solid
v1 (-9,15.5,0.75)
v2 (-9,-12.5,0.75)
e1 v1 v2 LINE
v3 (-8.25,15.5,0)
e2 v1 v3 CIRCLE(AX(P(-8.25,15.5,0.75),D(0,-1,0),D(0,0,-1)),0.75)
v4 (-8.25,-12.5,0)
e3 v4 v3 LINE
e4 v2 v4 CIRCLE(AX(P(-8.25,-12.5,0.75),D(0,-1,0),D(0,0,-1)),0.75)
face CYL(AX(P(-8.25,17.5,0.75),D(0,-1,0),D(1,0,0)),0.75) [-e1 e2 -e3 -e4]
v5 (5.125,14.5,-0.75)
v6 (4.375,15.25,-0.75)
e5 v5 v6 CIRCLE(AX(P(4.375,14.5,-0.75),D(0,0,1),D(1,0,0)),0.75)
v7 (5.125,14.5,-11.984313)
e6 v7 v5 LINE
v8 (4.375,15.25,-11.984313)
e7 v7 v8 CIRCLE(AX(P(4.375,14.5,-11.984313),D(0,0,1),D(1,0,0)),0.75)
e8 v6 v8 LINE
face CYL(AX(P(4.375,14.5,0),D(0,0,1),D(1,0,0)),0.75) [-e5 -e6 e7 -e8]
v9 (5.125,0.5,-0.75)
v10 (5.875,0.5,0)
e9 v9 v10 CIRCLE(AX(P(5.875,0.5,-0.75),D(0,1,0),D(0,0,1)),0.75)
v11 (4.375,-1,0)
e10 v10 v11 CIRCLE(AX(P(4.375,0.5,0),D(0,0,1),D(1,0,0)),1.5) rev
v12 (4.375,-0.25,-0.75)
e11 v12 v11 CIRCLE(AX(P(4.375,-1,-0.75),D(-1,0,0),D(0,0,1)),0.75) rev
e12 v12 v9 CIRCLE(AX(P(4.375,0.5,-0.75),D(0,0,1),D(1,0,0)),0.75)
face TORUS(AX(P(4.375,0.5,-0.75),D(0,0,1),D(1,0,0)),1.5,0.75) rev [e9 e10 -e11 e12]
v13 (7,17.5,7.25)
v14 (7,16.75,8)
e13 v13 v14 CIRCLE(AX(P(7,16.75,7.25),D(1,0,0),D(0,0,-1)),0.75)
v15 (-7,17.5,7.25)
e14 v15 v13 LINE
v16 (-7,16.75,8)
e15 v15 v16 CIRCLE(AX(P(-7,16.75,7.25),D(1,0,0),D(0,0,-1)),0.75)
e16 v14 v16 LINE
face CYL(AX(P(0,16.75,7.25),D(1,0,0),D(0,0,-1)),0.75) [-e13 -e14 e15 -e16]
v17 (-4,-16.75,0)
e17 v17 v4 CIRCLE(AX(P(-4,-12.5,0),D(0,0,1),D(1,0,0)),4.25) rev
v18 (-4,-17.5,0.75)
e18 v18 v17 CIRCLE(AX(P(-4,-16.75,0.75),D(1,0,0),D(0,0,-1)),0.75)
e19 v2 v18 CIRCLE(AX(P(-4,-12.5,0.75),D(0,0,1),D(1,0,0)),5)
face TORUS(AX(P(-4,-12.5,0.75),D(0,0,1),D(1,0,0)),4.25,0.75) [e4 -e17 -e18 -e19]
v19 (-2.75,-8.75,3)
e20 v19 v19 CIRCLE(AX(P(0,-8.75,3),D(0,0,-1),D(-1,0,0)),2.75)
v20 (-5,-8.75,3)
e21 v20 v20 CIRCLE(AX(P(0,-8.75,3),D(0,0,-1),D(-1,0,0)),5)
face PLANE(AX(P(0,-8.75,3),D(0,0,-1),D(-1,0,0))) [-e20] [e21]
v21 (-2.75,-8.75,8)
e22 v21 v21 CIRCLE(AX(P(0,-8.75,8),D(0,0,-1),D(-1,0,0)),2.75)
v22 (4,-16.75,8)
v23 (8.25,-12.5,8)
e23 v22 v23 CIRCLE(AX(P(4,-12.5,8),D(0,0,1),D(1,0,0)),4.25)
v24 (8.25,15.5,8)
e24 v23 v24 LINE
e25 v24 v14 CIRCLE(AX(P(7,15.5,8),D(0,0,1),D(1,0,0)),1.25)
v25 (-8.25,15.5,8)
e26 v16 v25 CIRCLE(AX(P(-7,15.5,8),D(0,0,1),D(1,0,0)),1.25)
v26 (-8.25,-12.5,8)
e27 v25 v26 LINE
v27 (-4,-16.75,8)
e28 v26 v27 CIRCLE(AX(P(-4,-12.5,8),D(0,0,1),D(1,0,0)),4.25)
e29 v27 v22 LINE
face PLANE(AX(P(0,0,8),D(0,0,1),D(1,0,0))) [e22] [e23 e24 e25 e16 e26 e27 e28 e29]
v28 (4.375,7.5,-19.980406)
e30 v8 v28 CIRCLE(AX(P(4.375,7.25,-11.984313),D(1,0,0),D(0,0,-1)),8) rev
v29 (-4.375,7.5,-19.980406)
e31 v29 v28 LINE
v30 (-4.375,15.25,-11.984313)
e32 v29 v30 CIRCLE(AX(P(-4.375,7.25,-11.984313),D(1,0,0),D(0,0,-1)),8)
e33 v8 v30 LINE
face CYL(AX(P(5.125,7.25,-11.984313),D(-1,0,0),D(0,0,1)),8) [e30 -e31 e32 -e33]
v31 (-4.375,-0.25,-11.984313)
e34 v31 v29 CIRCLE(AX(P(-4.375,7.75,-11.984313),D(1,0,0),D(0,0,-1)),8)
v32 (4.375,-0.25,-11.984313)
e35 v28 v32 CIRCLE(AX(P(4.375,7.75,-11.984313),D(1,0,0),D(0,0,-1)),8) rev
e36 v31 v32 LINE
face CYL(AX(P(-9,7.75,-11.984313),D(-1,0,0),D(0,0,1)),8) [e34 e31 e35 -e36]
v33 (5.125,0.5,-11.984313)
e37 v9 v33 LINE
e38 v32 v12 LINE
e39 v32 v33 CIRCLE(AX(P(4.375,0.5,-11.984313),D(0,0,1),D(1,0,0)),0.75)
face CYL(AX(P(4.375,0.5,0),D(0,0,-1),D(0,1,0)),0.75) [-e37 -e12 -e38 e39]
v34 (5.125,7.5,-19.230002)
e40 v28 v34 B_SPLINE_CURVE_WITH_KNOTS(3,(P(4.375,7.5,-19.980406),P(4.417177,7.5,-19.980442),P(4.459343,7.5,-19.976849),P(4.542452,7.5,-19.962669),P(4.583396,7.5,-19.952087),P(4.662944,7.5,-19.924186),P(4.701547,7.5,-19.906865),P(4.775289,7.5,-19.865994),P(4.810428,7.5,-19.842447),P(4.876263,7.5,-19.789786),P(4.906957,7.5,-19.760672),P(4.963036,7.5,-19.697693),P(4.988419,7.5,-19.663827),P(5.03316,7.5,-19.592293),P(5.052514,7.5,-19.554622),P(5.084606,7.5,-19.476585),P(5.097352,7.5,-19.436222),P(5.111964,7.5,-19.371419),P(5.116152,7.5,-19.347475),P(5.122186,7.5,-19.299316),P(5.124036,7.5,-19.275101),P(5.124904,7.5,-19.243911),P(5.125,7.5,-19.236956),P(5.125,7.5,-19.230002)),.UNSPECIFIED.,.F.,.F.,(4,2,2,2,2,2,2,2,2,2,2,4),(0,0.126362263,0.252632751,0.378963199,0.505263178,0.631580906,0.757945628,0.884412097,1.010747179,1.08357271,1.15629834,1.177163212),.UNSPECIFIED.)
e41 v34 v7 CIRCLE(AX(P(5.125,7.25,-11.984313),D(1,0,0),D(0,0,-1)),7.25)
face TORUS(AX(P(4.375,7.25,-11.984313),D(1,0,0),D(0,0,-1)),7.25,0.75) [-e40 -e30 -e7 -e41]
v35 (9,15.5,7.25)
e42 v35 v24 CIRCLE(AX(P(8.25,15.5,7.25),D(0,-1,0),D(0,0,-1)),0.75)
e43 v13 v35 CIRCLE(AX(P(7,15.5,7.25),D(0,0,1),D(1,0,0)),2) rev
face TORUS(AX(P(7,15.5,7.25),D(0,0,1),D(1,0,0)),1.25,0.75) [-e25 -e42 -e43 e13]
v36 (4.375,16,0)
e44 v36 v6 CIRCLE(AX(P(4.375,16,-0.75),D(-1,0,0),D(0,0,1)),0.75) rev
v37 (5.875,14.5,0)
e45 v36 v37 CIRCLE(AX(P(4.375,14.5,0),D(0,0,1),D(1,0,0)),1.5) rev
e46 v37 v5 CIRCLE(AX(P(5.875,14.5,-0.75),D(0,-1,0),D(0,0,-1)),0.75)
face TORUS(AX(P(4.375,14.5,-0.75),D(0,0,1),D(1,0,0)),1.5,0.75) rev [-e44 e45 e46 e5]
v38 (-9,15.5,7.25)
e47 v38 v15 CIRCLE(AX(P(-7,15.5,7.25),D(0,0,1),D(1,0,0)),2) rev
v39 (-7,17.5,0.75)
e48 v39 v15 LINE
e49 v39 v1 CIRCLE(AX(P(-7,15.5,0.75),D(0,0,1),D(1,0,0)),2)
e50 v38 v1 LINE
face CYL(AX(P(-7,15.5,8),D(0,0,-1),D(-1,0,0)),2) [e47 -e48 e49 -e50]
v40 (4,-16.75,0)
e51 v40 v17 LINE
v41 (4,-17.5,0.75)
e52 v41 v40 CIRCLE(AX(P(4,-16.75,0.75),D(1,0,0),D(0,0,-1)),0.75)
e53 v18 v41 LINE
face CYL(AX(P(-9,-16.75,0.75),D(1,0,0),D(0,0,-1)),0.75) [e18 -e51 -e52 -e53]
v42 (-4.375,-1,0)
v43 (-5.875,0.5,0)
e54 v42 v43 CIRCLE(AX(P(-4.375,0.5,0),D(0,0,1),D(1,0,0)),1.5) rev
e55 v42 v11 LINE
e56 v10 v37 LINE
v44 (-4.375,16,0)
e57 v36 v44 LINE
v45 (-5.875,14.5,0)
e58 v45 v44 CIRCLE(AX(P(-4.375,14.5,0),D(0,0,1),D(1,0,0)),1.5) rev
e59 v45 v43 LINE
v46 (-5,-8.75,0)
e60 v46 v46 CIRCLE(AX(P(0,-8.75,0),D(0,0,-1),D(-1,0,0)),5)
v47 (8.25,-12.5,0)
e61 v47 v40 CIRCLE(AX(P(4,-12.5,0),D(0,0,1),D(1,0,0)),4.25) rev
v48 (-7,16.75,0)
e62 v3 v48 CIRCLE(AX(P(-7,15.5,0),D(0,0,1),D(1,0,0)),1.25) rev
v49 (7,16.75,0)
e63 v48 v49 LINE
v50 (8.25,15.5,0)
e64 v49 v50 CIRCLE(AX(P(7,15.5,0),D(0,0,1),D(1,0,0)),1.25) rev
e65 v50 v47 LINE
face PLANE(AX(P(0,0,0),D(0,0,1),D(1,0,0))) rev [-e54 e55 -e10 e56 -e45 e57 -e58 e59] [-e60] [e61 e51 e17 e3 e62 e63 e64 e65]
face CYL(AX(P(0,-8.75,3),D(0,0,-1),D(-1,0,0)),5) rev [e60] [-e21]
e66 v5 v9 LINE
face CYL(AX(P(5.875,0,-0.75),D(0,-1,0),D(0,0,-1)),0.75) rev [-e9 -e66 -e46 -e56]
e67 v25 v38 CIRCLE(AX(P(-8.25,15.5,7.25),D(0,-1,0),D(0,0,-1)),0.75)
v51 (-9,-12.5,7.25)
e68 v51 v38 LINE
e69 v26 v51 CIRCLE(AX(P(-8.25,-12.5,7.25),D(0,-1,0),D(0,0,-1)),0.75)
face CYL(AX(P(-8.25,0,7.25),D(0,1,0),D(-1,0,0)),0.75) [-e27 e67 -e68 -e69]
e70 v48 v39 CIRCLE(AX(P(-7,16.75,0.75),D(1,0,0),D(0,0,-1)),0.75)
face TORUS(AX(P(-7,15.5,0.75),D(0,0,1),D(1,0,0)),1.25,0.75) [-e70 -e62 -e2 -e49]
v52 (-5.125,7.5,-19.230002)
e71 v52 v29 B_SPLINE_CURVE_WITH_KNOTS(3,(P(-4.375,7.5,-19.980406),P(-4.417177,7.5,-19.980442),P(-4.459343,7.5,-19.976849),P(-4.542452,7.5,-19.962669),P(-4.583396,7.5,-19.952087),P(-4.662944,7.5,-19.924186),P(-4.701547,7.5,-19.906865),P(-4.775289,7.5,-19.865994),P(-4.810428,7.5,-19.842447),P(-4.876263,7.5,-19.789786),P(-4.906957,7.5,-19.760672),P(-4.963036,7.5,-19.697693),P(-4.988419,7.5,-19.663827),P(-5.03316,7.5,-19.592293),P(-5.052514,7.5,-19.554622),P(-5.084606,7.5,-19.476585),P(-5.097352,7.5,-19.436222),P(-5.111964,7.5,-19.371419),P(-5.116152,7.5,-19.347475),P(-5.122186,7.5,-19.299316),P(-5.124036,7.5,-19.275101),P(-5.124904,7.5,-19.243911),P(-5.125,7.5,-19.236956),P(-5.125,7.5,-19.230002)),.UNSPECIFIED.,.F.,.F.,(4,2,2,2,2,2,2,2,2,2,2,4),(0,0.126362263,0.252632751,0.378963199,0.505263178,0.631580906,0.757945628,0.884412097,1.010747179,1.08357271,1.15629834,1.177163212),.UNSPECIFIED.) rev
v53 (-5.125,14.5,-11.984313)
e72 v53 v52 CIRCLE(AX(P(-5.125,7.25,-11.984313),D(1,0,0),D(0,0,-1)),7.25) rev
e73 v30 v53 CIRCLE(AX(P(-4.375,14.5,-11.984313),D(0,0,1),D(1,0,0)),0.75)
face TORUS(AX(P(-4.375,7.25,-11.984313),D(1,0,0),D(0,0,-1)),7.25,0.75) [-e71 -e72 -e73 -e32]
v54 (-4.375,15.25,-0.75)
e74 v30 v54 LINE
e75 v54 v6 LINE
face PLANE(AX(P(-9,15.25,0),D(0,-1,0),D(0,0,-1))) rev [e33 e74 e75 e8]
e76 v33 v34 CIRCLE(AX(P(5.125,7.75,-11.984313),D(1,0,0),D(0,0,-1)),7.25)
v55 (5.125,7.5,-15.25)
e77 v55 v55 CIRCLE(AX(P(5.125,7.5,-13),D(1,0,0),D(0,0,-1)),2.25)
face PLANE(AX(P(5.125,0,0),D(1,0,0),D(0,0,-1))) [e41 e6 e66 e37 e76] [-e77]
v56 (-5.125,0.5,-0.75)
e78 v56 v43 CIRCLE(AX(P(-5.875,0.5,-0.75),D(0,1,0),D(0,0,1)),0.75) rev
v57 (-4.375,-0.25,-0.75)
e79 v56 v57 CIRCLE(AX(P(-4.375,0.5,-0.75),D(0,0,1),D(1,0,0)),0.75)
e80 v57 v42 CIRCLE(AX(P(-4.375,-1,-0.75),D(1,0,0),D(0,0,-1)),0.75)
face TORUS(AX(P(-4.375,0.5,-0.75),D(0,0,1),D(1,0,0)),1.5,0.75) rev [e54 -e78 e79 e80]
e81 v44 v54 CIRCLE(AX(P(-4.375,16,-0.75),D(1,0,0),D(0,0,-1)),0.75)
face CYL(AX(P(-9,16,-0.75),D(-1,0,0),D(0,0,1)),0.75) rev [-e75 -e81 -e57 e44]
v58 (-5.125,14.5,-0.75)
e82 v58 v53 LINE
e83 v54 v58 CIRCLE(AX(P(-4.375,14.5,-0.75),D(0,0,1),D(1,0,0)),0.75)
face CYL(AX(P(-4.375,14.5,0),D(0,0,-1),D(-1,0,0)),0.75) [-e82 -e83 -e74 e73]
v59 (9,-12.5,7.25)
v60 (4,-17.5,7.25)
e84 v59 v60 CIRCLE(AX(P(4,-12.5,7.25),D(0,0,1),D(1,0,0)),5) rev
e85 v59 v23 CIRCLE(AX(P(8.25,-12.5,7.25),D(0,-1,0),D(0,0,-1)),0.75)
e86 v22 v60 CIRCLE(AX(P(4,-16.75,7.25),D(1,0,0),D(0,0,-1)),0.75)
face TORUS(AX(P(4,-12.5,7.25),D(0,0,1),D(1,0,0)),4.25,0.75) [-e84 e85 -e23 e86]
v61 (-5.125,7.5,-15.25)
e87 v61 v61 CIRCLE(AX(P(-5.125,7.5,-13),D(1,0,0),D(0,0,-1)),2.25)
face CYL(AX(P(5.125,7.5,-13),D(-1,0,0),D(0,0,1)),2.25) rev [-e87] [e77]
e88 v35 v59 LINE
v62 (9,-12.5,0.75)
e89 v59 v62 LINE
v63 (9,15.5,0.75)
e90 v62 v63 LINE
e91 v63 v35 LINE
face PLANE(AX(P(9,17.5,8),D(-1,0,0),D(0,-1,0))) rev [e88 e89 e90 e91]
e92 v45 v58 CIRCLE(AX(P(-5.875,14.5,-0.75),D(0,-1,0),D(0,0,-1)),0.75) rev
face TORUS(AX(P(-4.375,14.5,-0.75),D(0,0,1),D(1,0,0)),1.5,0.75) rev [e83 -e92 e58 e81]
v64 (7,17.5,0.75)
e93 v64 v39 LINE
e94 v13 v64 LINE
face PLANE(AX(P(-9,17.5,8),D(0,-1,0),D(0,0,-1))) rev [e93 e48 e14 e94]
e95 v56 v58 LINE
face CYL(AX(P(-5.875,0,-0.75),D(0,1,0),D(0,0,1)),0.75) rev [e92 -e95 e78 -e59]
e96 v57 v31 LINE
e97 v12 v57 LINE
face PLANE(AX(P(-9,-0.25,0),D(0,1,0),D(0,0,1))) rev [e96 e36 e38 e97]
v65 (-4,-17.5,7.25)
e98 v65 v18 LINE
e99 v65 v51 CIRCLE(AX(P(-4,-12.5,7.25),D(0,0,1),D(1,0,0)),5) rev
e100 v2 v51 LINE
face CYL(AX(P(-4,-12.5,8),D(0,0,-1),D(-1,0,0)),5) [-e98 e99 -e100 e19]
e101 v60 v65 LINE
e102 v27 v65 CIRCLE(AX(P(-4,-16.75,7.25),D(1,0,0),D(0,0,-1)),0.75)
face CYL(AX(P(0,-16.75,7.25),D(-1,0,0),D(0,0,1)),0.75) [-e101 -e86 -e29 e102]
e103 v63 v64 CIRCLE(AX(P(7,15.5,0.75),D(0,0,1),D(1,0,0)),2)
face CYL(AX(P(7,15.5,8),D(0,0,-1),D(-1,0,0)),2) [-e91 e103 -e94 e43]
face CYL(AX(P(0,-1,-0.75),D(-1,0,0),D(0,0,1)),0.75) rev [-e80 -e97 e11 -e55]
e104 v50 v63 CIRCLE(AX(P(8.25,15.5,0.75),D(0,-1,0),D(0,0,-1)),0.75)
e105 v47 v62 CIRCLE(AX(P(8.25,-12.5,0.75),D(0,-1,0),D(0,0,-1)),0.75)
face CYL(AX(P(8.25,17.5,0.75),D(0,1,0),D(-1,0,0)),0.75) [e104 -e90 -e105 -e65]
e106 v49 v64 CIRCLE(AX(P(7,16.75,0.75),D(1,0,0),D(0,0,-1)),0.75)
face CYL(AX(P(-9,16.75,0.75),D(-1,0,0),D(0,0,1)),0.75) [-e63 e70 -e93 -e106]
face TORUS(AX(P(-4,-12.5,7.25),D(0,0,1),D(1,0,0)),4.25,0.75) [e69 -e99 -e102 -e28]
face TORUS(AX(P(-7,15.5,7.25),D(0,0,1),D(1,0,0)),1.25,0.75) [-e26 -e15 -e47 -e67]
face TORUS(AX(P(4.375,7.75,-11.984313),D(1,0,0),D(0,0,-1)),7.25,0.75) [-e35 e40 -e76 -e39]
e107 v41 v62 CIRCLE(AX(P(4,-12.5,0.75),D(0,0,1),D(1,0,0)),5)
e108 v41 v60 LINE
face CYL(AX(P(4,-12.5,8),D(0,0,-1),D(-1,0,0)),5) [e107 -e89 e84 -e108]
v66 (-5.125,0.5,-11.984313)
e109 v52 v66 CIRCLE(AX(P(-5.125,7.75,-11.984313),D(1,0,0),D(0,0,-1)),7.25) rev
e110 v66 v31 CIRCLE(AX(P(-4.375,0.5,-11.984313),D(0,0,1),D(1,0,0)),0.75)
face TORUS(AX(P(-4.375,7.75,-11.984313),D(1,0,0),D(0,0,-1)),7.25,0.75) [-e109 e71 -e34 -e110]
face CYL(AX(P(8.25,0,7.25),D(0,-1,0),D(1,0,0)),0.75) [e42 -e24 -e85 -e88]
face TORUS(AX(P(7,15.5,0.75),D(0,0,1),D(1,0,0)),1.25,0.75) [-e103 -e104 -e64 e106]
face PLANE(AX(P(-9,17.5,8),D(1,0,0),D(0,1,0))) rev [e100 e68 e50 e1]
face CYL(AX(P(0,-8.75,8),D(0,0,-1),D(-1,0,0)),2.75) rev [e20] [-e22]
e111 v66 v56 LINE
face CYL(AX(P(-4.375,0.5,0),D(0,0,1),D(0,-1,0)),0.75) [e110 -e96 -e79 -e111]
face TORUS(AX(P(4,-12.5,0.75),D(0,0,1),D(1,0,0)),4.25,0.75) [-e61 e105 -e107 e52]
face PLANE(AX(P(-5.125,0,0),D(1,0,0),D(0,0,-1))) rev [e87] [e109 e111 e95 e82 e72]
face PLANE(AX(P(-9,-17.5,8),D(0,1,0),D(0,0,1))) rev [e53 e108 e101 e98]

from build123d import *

# Parameters (mm, degrees)
BOSS_EXTRUDE1_DEPTH = 8
SKETCH2_R           = 2.2500000000000058
BOSS_EXTRUDE2_DEPTH = 5.125
FILLET1_R           = 10
FILLET5_R           = 5
FILLET6_R           = 2
SKETCH5_R           = 2.749999999999998
CUT_EXTRUDE1_DEPTH  = 29.057975693196408
SKETCH5_3_R         = 5.000000000000001
SKETCH5_3_R_2       = 2.749999999999998
CUT_EXTRUDE2_DEPTH  = 3
CUT_EXTRUDE3_DEPTH  = 31.095940340849967
FILLET8_R           = 8
FILLET11_R          = 0.75


# Some blends are built 0.0001 mm under size
with BuildPart() as part:
    # Sketch1 → Boss-Extrude1 (new body)
    with BuildSketch(Plane.XY):
        Polygon((-9, 17.500000000000004), (9, 17.500000000000004), (9.000000000000004, -17.499999999999996), (-8.999999999999996, -17.499999999999996), align=None)
    extrude(amount=BOSS_EXTRUDE1_DEPTH)

    # Sketch2 → Boss-Extrude2 (add, symmetric)
    with BuildSketch(Plane(origin=(0, 0, 0), x_dir=(0, 0, -1), z_dir=(1, 0, 0))):
        Polygon((0, 17.500000000000004), (20, 17.500000000000007), (20.000000000000007, -2.499999999999992), (2.14e-15, -2.499999999999992), align=None)
        with Locations((13.000000000000002, 7.500000000000007)):
            Circle(SKETCH2_R, mode=Mode.SUBTRACT)
    extrude(amount=BOSS_EXTRUDE2_DEPTH, both=True)

    # Fillet1
    fillet1_edges = [part.edges().sort_by_distance(p)[0] for p in [
        (0, 17.500000000000007, -20),
        (0, -2.499999999999992, -20.000000000000007),
    ]]
    fillet(fillet1_edges, radius=FILLET1_R - 0.0001)  # a hair under: the kernel refuses the full size

    # Fillet5
    fillet5_edges = [part.edges().sort_by_distance(p)[0] for p in [
        (9.000000000000004, -17.499999999999996, 4),
        (-8.999999999999996, -17.499999999999996, 4),
    ]]
    fillet(fillet5_edges, radius=FILLET5_R)

    # Fillet6
    fillet6_edges = [part.edges().sort_by_distance(p)[0] for p in [
        (-9, 17.500000000000004, 4),
        (9, 17.500000000000004, 4),
    ]]
    fillet(fillet6_edges, radius=FILLET6_R)

    # Sketch5 → Cut-Extrude1 (cut, through all)
    with BuildSketch(Plane(origin=(0, 0, 0), x_dir=(-1, 0, 0), z_dir=(0, 0, -1))):
        with Locations((0, -8.75)):
            Circle(SKETCH5_R)
    extrude(amount=-CUT_EXTRUDE1_DEPTH, mode=Mode.SUBTRACT)

    # Sketch5<3> → Cut-Extrude2 (cut)
    with BuildSketch(Plane(origin=(0, 0, 0), x_dir=(-1, 0, 0), z_dir=(0, 0, -1))):
        with Locations((0, -8.75)):
            Circle(SKETCH5_3_R)
        with Locations((0, -8.75)):
            Circle(SKETCH5_3_R_2, mode=Mode.SUBTRACT)
    extrude(amount=-CUT_EXTRUDE2_DEPTH, mode=Mode.SUBTRACT)

    # Sketch6 → Cut-Extrude3 (cut, through all)
    with BuildSketch(Plane(origin=(5.125, 0, 0), x_dir=(0, 0, -1), z_dir=(1, 0, 0))):
        Polygon((0, 17.500000000000004), (20, 17.500000000000004), (20.000000000000004, 15.250000000000005), (2.8e-16, 15.250000000000005), align=None)
        Polygon((19.999999999999996, -2.499999999999992), (20.000000000000004, -0.24999999999998807), (7.21e-15, -0.24999999999999156), (6.94e-15, -2.499999999999992), align=None)
    extrude(amount=-CUT_EXTRUDE3_DEPTH, mode=Mode.SUBTRACT)

    # Fillet8
    # the kernel refuses this fillet: 8 mm, written as the material it takes off along each edge
    with BuildSketch(Plane(origin=(29.35923701875709, -0.2499999999999887, -16.31967672633224), x_dir=(0, -1.5e-16, 1), z_dir=(-1, 0, 0))) as fillet8_piece_1:
        with BuildLine():
            CenterArc((4.335351436704053, 8), FILLET8_R, 172.8217708442513, 97.17822915574868)
            Line((-3.6019465867097984, 8.99964998249916), (-4.395676389051184, 9.099614980749076))
            ThreePointArc((-4.395676389051184, 9.099614980749076), (-4.480323273667765, 7.750099999999992), (-0.5055711938185182, -0.6199981999819997))
            Line((-0.5055711938185182, -0.6199981999819997), (1.2e-16, -0.8))
            Line((1.2e-16, -0.8), (4.335351436704052, -0.8))
            Line((4.335351436704052, -0.8), (4.335351436704052, 0))
        make_face()
    extrude(amount=58.718474037514184, mode=Mode.SUBTRACT)
    with BuildSketch(Plane(origin=(29.35923701875702, 15.250000000000005, -16.31967672633223), x_dir=(0, -0.9284024472828977, -0.37157623158529146), z_dir=(-1, 0, 0))) as fillet8_piece_2:
        with BuildLine():
            CenterArc((5.816306028814807, 6.9975607363498025), FILLET8_R, 201.81286045411787, 97.17822915574845)
            Line((-1.610913549448369, 4.024950883667459), (-2.3536355072746873, 3.727689898399224))
            Line((-2.3536355072746873, 3.727689898399224), (-0.7427219578263171, -0.29726098526823275))
            Line((-0.7427219578263171, -0.29726098526823275), (-0.38774960717711915, -0.6997501283558207))
            ThreePointArc((-0.38774960717711915, -0.6997501283558207), (8.859993445000528, -1.2797901394825208), (10.081433685371605, -0.6997560736349794))
            Line((10.081433685371605, -0.6997560736349794), (9.693694807502807, 5.1e-16))
        make_face()
    extrude(amount=58.71847403751404, mode=Mode.SUBTRACT)

    # Fillet11
    fillet11_edges = [part.edges().sort_by_distance(p)[0] for p in [
        (5.125, -0.2499999999999905, -5.9921626448140035),
        (-5.125, -0.24999999999999029, -5.9921626448140035),
        (5.125, 12.994562646523407, -17.552089652471594),
        (5.125, 2.00543735344751, -17.5520896524431),
        (-5.125, 12.994562646523407, -17.552089652471594),
        (-5.125, 2.00543735344751, -17.5520896524431),
        (0, 17.500000000000004, 0),
        (9.000000000000002, 1.5000000000000036, 0),
        (9.000000000000002, 1.5000000000000036, 8),
        (3.55e-15, -17.499999999999996, 0),
        (-7.535533905932736, -16.035533905932734, 0),
        (7.535533905932741, -16.035533905932734, 0),
        (3.55e-15, -17.499999999999996, 8),
        (-7.535533905932736, -16.035533905932734, 8),
        (7.535533905932741, -16.035533905932734, 8),
        (-8.999999999999998, 1.5000000000000036, 0),
        (-8.999999999999998, 1.5000000000000036, 8),
        (8.414213562373096, 16.9142135623731, 0),
        (-8.414213562373096, 16.9142135623731, 0),
        (0, 17.500000000000004, 8),
        (8.414213562373096, 16.9142135623731, 8),
        (-8.414213562373096, 16.9142135623731, 8),
        (-5.125, 7.500000000000006, -1.07e-15),
        (5.125, 7.500000000000006, -1.07e-15),
        (-5.125, 15.250000000000005, -5.992162644814096),
        (0, 15.250000000000005, -2.8e-16),
        (5.125, 15.250000000000005, -5.992162644814096),
        (0, -0.24999999999999156, -7.21e-15),
    ]]
    fillet(fillet11_edges, radius=FILLET11_R)


solid = part.part
